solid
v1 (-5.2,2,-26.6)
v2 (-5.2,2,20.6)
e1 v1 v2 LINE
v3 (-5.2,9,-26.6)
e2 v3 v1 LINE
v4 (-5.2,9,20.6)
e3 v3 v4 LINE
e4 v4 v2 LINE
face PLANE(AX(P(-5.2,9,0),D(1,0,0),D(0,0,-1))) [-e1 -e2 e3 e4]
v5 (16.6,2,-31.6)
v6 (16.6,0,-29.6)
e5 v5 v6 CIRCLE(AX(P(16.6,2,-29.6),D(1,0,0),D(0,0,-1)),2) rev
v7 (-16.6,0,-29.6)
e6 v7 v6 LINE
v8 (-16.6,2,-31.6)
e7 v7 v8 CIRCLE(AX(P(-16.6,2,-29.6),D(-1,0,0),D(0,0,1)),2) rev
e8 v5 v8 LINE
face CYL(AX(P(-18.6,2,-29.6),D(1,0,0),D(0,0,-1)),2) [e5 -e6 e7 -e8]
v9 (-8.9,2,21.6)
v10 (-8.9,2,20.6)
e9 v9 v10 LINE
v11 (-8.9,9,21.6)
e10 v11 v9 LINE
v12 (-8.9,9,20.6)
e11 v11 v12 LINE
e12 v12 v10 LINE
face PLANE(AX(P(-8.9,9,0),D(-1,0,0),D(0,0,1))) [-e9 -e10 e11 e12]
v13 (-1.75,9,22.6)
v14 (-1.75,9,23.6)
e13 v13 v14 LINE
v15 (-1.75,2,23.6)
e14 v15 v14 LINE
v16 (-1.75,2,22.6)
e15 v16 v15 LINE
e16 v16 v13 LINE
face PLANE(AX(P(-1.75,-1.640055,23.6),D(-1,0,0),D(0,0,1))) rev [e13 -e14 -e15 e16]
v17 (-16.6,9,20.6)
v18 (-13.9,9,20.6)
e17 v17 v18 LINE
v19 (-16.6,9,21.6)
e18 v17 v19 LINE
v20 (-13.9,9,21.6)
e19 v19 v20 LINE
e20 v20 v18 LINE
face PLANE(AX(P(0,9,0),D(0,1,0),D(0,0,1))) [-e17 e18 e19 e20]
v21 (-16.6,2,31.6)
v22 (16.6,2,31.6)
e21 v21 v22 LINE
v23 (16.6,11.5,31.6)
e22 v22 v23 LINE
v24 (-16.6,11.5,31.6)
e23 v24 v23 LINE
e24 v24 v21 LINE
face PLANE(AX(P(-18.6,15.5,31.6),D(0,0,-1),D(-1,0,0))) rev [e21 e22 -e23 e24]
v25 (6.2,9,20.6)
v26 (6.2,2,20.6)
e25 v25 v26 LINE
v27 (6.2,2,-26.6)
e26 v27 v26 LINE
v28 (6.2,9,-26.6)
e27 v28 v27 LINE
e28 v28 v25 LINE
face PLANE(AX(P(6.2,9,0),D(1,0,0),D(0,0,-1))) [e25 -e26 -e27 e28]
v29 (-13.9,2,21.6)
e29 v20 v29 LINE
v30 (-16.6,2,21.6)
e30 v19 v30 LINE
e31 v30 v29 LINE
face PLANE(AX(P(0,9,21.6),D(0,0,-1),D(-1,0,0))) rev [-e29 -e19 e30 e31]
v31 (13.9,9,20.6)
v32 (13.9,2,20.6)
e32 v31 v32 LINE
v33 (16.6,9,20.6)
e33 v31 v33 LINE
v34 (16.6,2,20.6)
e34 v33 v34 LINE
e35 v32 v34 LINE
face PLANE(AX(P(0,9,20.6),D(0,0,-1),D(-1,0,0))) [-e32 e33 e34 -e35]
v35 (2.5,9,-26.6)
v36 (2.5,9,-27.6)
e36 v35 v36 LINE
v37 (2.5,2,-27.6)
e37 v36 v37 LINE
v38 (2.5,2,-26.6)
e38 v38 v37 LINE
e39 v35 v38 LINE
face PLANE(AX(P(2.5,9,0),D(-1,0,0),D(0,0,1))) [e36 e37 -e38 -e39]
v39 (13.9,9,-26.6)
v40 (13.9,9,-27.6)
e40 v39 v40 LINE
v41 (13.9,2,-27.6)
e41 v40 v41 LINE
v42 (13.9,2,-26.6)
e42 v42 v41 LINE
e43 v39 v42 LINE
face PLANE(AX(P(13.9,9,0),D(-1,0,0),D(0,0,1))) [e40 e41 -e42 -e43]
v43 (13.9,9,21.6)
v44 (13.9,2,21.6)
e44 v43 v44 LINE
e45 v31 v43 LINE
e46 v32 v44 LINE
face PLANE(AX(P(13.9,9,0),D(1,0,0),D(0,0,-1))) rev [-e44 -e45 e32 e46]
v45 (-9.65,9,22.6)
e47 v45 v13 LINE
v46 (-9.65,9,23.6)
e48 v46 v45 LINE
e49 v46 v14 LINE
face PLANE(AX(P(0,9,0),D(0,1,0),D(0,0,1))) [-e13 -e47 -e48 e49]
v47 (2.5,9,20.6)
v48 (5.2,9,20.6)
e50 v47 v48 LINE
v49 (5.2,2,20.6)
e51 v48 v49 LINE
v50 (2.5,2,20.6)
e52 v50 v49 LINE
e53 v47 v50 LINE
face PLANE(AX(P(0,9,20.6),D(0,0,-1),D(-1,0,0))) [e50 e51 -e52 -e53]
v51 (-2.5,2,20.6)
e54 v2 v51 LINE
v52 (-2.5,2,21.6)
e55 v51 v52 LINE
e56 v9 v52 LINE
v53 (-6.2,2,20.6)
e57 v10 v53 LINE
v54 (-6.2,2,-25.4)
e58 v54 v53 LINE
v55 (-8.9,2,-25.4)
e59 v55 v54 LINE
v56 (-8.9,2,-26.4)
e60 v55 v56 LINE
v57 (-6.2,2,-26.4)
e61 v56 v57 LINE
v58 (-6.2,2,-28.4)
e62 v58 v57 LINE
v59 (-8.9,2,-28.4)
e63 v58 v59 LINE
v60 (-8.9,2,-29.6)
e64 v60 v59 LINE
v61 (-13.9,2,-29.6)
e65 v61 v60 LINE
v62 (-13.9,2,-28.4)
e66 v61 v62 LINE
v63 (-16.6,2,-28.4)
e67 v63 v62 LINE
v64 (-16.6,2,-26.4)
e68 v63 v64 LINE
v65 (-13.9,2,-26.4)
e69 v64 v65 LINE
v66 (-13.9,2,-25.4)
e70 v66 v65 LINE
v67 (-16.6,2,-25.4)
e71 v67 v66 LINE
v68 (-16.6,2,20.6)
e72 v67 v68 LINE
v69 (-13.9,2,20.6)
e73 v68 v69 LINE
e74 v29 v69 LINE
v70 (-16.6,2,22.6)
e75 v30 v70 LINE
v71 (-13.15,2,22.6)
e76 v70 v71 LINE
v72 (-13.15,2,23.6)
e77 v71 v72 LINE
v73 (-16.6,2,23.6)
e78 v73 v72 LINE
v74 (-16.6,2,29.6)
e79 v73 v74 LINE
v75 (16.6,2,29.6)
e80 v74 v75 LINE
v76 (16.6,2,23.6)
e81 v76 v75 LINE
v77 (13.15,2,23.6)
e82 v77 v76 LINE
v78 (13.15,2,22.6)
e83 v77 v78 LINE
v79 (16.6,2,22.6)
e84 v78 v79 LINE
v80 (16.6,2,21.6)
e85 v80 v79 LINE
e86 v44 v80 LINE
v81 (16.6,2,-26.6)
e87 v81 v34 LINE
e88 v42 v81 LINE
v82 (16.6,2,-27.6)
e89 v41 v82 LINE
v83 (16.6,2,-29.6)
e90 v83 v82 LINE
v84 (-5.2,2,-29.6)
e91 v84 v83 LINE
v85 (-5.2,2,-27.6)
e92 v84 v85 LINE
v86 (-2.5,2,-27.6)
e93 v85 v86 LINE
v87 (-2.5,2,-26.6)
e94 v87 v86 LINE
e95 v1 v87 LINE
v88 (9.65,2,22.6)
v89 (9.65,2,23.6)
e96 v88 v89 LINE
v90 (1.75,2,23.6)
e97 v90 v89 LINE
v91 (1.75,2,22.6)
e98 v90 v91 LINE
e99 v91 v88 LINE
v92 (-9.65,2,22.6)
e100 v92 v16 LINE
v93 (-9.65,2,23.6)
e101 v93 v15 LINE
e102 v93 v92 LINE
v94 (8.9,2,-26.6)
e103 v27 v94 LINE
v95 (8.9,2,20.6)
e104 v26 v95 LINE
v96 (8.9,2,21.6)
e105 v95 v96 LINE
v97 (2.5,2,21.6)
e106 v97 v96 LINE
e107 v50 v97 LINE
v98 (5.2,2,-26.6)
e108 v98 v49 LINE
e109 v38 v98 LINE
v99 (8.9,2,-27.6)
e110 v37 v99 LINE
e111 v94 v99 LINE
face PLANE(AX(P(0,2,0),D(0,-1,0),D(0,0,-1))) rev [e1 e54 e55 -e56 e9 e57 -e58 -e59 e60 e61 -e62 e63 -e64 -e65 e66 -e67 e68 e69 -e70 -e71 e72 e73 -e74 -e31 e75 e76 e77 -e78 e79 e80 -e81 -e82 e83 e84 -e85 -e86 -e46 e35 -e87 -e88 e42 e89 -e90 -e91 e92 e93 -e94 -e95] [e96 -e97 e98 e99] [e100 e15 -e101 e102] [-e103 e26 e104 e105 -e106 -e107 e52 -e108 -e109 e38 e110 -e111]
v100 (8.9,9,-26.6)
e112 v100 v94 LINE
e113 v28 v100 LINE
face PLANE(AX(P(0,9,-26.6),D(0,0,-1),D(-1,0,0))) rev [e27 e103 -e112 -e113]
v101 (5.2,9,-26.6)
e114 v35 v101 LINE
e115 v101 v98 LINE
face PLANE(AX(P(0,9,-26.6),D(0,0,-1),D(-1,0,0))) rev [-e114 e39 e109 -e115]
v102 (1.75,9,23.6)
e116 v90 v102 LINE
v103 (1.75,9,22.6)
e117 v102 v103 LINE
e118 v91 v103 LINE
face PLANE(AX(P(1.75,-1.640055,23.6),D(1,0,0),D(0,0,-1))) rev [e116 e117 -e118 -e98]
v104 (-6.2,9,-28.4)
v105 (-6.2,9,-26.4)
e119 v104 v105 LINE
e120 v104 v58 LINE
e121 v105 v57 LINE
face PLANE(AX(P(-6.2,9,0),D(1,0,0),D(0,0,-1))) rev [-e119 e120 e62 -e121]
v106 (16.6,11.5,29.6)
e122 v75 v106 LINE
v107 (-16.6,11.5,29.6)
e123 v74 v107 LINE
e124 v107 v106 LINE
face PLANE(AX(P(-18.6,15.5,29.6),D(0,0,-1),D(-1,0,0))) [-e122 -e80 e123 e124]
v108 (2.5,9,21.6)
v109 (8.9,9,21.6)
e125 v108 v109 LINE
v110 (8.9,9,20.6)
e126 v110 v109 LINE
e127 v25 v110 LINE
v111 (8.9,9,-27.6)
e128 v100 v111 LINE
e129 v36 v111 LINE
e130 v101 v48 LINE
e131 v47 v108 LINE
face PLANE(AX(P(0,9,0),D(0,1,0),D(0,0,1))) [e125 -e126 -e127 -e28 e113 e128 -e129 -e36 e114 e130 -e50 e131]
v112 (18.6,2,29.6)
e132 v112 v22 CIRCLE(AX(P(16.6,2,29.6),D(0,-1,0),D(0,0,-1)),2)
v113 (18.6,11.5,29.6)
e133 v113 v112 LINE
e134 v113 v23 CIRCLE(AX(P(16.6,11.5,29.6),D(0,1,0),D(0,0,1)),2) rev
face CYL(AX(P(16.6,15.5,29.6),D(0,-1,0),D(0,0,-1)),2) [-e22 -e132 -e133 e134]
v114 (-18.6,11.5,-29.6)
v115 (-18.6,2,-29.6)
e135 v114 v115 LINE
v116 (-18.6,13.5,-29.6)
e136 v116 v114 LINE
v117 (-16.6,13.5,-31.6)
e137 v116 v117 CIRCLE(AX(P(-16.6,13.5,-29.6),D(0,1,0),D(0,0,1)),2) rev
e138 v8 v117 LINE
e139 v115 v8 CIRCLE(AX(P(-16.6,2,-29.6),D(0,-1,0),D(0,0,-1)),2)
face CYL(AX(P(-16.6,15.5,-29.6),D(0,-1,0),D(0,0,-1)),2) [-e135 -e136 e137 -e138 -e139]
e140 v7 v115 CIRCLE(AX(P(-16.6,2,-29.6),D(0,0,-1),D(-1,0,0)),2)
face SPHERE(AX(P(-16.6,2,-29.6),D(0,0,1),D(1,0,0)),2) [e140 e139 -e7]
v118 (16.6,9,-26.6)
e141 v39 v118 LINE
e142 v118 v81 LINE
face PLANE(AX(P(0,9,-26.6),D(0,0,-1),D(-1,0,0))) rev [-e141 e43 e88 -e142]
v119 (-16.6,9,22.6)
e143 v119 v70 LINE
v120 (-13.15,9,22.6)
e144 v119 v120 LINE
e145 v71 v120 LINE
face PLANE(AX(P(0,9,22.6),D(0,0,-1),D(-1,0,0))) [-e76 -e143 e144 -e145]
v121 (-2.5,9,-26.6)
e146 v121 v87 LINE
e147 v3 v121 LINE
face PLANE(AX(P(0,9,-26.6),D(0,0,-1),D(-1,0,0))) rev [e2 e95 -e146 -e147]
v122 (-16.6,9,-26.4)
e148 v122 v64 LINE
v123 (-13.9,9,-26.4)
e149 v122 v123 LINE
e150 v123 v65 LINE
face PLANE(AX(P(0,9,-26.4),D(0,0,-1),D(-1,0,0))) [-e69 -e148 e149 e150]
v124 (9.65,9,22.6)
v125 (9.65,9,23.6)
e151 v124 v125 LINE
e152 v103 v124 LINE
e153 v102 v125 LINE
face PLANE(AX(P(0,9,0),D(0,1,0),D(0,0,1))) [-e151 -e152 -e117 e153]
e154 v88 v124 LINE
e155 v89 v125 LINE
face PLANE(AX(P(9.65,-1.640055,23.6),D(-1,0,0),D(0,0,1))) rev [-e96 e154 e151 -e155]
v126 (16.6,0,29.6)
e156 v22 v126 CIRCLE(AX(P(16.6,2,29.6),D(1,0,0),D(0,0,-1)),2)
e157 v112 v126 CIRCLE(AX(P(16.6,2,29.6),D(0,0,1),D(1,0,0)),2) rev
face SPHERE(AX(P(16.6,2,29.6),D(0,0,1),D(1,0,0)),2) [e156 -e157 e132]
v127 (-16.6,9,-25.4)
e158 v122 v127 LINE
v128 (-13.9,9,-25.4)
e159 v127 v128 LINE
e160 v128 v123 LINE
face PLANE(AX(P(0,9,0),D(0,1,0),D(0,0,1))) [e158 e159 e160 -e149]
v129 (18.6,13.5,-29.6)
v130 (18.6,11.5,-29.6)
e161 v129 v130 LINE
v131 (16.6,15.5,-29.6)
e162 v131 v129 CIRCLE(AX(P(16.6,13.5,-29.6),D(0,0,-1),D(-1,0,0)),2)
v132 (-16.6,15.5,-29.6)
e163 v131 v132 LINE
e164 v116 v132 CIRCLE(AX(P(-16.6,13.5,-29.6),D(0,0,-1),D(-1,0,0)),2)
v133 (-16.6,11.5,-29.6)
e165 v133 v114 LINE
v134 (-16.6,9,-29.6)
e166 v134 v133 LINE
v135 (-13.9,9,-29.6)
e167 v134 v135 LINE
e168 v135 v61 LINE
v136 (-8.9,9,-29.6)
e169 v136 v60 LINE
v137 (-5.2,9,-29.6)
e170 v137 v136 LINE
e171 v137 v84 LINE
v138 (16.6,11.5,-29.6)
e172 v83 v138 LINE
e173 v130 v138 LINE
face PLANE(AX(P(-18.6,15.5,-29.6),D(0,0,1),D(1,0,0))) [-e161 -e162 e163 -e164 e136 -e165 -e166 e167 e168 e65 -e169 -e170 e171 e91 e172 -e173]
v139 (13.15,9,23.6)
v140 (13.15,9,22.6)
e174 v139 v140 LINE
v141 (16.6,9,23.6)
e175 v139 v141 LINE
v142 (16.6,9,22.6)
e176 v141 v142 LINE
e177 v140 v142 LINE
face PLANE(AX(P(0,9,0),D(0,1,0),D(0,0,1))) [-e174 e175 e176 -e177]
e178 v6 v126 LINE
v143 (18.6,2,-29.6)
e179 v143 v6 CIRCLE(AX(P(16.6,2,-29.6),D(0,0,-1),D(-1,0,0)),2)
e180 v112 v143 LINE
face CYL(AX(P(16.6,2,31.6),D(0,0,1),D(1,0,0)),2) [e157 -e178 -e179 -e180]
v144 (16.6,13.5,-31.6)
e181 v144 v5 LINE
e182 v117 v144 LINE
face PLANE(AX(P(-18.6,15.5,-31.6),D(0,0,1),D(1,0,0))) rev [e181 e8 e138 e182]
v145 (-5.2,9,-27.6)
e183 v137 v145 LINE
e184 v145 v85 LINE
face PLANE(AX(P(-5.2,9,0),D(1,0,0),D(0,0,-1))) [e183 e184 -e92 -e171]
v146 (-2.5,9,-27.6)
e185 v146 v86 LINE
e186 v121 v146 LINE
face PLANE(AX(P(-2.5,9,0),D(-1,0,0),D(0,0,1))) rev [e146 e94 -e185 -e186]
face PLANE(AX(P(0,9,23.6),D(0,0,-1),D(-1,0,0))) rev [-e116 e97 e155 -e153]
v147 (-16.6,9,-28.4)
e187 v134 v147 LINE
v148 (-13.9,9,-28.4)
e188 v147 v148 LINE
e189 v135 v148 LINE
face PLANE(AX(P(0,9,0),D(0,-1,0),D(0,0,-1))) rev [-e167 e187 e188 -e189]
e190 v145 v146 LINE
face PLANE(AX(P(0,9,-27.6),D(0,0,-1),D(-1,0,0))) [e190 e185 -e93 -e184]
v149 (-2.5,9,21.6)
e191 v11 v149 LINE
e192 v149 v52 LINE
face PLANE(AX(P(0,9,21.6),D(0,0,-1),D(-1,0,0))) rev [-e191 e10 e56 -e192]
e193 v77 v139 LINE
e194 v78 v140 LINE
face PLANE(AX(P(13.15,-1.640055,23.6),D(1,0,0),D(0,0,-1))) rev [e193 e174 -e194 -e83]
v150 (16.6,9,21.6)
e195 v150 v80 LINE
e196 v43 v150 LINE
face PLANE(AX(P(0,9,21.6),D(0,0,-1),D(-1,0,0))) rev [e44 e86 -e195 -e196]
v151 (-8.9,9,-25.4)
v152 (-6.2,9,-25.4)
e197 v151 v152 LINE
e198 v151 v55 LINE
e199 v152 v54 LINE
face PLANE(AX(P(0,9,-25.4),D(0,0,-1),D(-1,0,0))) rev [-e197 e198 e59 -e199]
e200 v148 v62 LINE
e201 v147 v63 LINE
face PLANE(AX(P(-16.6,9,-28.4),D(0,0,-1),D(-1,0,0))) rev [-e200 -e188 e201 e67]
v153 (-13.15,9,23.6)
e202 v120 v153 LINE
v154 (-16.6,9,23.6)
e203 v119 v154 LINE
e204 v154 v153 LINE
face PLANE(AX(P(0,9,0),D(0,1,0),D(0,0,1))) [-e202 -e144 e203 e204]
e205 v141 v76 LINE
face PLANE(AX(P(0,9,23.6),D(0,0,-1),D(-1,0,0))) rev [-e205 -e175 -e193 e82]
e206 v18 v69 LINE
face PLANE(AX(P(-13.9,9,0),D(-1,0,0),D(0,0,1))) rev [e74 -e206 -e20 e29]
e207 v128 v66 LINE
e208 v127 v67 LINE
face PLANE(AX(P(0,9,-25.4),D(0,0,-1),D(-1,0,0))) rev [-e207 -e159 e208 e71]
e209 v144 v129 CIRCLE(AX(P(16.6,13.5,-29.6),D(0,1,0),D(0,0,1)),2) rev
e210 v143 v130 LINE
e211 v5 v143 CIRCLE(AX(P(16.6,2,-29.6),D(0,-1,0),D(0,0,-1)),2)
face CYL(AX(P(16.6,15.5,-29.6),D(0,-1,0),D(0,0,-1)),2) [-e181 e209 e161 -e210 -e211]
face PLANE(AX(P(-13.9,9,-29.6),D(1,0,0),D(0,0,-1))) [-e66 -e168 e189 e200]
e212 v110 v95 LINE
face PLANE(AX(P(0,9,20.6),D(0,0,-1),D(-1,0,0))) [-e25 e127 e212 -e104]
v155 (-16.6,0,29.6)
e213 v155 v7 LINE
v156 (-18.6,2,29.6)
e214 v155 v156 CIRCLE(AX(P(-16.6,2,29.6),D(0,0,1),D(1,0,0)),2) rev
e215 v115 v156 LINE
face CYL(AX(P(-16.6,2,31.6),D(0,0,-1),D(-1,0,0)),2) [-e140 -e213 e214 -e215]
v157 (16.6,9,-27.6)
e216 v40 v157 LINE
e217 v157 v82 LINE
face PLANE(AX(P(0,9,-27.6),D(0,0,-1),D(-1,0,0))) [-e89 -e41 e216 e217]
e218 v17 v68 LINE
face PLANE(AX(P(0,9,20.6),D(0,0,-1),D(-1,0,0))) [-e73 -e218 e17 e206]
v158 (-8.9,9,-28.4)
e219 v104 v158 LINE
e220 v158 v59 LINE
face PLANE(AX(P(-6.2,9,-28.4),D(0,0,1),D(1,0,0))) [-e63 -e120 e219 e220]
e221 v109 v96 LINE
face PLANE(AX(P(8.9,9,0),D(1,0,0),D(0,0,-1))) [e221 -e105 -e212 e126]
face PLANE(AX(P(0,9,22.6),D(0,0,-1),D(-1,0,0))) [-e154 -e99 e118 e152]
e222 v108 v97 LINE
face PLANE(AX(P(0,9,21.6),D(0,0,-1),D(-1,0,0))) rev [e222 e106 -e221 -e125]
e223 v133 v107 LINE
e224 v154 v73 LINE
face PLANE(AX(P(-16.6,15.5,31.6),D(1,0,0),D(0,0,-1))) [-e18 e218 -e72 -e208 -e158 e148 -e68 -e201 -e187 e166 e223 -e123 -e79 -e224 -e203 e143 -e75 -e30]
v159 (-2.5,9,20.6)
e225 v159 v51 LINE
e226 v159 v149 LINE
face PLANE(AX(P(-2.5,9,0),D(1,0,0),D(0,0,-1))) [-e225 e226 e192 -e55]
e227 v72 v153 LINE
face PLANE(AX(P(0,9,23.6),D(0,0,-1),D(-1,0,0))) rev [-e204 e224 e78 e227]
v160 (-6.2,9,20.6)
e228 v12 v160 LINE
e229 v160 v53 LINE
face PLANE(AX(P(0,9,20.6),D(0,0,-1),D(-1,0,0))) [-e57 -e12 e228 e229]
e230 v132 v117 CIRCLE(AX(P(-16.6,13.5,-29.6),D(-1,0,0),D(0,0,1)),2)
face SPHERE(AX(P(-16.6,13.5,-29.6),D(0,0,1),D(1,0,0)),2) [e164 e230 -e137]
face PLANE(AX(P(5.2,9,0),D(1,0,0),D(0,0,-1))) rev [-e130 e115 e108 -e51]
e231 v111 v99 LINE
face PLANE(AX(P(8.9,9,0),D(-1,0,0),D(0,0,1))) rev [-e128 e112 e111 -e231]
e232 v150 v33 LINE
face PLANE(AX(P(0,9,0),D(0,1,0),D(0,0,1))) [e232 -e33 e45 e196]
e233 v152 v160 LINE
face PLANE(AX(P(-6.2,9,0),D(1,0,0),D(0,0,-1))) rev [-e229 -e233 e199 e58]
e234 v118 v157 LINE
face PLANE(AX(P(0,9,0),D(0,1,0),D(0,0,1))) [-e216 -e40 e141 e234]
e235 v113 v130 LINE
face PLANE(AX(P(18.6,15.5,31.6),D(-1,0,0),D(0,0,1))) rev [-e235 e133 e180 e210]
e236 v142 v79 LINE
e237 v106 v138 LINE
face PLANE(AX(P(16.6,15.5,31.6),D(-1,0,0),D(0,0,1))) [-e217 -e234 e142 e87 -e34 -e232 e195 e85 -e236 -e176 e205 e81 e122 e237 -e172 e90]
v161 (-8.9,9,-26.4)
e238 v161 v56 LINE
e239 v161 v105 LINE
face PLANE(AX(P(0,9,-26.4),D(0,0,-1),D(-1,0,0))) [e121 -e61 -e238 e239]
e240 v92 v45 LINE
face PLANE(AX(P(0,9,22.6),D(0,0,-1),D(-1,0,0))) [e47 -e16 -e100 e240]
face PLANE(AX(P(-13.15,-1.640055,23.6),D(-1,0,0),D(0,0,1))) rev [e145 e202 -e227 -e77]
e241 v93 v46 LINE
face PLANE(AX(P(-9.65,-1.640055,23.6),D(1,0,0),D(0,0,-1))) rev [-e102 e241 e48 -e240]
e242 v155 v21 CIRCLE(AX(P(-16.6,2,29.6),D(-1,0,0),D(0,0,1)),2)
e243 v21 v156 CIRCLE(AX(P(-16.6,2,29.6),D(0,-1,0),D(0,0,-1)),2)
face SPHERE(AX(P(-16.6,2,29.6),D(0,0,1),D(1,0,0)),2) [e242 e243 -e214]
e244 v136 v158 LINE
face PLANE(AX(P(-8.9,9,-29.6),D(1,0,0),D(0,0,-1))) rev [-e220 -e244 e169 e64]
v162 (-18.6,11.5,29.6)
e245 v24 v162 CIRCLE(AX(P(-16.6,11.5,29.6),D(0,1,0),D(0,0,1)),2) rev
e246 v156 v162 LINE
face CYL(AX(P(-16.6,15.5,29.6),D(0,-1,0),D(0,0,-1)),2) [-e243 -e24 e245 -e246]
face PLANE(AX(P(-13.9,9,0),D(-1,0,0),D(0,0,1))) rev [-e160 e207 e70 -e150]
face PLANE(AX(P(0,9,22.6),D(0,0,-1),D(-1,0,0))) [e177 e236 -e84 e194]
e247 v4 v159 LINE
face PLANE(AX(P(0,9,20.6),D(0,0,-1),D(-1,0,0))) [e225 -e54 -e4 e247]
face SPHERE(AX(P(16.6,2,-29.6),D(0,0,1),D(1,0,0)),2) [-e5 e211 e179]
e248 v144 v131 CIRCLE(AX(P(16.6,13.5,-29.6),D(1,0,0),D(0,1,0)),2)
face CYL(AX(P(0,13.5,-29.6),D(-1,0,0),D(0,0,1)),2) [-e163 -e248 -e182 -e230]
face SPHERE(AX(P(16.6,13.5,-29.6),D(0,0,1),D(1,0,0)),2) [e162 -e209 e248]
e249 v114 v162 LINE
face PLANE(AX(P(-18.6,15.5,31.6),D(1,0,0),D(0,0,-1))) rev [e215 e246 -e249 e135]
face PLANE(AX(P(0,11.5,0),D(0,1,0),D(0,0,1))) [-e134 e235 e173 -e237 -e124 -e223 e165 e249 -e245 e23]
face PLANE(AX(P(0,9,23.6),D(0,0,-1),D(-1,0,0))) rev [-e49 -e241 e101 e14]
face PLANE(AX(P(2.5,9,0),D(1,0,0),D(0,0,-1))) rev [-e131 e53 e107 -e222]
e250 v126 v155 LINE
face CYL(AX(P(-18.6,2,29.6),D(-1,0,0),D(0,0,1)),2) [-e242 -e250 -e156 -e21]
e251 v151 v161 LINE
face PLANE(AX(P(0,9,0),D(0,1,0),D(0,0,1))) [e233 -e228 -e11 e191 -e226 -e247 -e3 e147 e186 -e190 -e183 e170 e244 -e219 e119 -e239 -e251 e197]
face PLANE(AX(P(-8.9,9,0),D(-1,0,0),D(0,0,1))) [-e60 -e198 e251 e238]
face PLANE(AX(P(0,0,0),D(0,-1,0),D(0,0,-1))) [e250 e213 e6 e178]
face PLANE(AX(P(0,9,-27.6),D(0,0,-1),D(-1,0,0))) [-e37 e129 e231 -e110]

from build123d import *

# Parameters (mm, degrees)
SKETCH1_W           = 37.2
SKETCH1_H           = 63.2
BOSS_EXTRUDE1_DEPTH = 15.5
FILLET1_R           = 2
SHELL1_START        = -16.6
SHELL1_OUTLINE_W    = 13.5
SHELL1_OUTLINE_H    = 59.2
SHELL1_DEPTH        = 33.2
CUT_EXTRUDE1_START  = 9.5
SKETCH2_W           = 37.2
SKETCH2_H           = 61.2
CUT_EXTRUDE1_DEPTH  = 4
SKETCH3_W           = 2.7
SKETCH3_H           = 1
SKETCH3_W_2         = 1
SKETCH3_H_2         = 47.2
SKETCH3_W_3         = 33.2
SKETCH3_H_3         = 1.2
BOSS_EXTRUDE2_DEPTH = 7
SKETCH4_W           = 3.5
SKETCH4_H           = 1
CUT_EXTRUDE2_DEPTH  = 7


# Read off the part's stored shape, not the designer's step: Shell1
with BuildPart() as part:
    # Sketch1 → Boss-Extrude1 (new body)
    with BuildSketch(Plane(origin=(0, 0, 0), x_dir=(1, 0, 0), z_dir=(0, 1, 0))):
        Rectangle(SKETCH1_W, SKETCH1_H)
    extrude(amount=BOSS_EXTRUDE1_DEPTH)

    # Fillet1
    fillet1_edges = [part.edges().sort_by_distance(p)[0] for p in [
        (-18.6, 15.5, 0),
        (0, 15.5, 31.6),
        (18.6, 15.5, 0),
        (0, 0, 31.6),
        (-18.6, 0, 0),
        (0, 0, -31.6),
        (18.6, 0, 0),
        (18.6, 7.75, 31.6),
        (-18.6, 7.75, 31.6),
        (-18.6, 7.75, -31.6),
        (18.6, 7.75, -31.6),
        (0, 15.5, -31.6),
    ]]
    fillet(fillet1_edges, radius=FILLET1_R)

    # Shell1 outline → Shell1 (cut)
    with BuildSketch(Plane.YZ.offset(SHELL1_START)):
        with Locations((8.75, 0)):
            Rectangle(SHELL1_OUTLINE_W, SHELL1_OUTLINE_H)
    extrude(amount=SHELL1_DEPTH, mode=Mode.SUBTRACT)

    # Sketch2 → Cut-Extrude1 (cut)
    with BuildSketch(Plane(origin=(0, 2, 0), x_dir=(1, 0, 0), z_dir=(0, 1, 0)).offset(CUT_EXTRUDE1_START)):
        with Locations((0, -1)):
            Rectangle(SKETCH2_W, SKETCH2_H)
    extrude(amount=CUT_EXTRUDE1_DEPTH, mode=Mode.SUBTRACT)

    # Sketch3 → Boss-Extrude2 (add)
    with BuildSketch(Plane(origin=(0, 2, 0), x_dir=(1, 0, 0), z_dir=(0, 1, 0))):
        with Locations((-15.25, 25.9)):
            Rectangle(SKETCH3_W, SKETCH3_H)
        with Locations((-7.55, 25.9)):
            Rectangle(SKETCH3_W, SKETCH3_H)
        Polygon((-6.2, 29.6), (-6.2, 28.4), (-6.2, 26.4), (-6.2, 25.4), (-6.2, -20.6), (-5.2, -20.6), (-5.2, 26.6), (-5.2, 27.6), (-5.2, 29.6), align=None)
        with Locations((-3.85, 27.1)):
            Rectangle(SKETCH3_W, SKETCH3_H)
        Polygon((8.9, 27.6), (2.5, 27.6), (2.5, 26.6), (5.2, 26.6), (6.2, 26.6), (8.9, 26.6), align=None)
        with Locations((15.25, 27.1)):
            Rectangle(SKETCH3_W, SKETCH3_H)
        with Locations((5.7, 3)):
            Rectangle(SKETCH3_W_2, SKETCH3_H_2)
        with Locations((-15.25, -21.1)):
            Rectangle(SKETCH3_W, SKETCH3_H)
        Polygon((-5.2, -20.6), (-6.2, -20.6), (-8.9, -20.6), (-8.9, -21.6), (-2.5, -21.6), (-2.5, -20.6), align=None)
        Polygon((5.2, -20.6), (2.5, -20.6), (2.5, -21.6), (8.9, -21.6), (8.9, -20.6), (6.2, -20.6), align=None)
        with Locations((15.25, -21.1)):
            Rectangle(SKETCH3_W, SKETCH3_H)
        with Locations((0, -23.1)):
            Rectangle(SKETCH3_W_3, SKETCH3_H)
        with Locations((-15.25, 29)):
            Rectangle(SKETCH3_W, SKETCH3_H_3)
        with Locations((-7.55, 29)):
            Rectangle(SKETCH3_W, SKETCH3_H_3)
    extrude(amount=BOSS_EXTRUDE2_DEPTH)

    # Sketch4 → Cut-Extrude2 (cut)
    with BuildSketch(Plane(origin=(0, 9, 0), x_dir=(1, 0, 0), z_dir=(0, 1, 0))):
        with Locations((-11.4, -23.1)):
            Rectangle(SKETCH4_W, SKETCH4_H)
        with Locations((0, -23.1)):
            Rectangle(SKETCH4_W, SKETCH4_H)
        with Locations((11.4, -23.1)):
            Rectangle(SKETCH4_W, SKETCH4_H)
    extrude(amount=-CUT_EXTRUDE2_DEPTH, mode=Mode.SUBTRACT)


solid = part.part
